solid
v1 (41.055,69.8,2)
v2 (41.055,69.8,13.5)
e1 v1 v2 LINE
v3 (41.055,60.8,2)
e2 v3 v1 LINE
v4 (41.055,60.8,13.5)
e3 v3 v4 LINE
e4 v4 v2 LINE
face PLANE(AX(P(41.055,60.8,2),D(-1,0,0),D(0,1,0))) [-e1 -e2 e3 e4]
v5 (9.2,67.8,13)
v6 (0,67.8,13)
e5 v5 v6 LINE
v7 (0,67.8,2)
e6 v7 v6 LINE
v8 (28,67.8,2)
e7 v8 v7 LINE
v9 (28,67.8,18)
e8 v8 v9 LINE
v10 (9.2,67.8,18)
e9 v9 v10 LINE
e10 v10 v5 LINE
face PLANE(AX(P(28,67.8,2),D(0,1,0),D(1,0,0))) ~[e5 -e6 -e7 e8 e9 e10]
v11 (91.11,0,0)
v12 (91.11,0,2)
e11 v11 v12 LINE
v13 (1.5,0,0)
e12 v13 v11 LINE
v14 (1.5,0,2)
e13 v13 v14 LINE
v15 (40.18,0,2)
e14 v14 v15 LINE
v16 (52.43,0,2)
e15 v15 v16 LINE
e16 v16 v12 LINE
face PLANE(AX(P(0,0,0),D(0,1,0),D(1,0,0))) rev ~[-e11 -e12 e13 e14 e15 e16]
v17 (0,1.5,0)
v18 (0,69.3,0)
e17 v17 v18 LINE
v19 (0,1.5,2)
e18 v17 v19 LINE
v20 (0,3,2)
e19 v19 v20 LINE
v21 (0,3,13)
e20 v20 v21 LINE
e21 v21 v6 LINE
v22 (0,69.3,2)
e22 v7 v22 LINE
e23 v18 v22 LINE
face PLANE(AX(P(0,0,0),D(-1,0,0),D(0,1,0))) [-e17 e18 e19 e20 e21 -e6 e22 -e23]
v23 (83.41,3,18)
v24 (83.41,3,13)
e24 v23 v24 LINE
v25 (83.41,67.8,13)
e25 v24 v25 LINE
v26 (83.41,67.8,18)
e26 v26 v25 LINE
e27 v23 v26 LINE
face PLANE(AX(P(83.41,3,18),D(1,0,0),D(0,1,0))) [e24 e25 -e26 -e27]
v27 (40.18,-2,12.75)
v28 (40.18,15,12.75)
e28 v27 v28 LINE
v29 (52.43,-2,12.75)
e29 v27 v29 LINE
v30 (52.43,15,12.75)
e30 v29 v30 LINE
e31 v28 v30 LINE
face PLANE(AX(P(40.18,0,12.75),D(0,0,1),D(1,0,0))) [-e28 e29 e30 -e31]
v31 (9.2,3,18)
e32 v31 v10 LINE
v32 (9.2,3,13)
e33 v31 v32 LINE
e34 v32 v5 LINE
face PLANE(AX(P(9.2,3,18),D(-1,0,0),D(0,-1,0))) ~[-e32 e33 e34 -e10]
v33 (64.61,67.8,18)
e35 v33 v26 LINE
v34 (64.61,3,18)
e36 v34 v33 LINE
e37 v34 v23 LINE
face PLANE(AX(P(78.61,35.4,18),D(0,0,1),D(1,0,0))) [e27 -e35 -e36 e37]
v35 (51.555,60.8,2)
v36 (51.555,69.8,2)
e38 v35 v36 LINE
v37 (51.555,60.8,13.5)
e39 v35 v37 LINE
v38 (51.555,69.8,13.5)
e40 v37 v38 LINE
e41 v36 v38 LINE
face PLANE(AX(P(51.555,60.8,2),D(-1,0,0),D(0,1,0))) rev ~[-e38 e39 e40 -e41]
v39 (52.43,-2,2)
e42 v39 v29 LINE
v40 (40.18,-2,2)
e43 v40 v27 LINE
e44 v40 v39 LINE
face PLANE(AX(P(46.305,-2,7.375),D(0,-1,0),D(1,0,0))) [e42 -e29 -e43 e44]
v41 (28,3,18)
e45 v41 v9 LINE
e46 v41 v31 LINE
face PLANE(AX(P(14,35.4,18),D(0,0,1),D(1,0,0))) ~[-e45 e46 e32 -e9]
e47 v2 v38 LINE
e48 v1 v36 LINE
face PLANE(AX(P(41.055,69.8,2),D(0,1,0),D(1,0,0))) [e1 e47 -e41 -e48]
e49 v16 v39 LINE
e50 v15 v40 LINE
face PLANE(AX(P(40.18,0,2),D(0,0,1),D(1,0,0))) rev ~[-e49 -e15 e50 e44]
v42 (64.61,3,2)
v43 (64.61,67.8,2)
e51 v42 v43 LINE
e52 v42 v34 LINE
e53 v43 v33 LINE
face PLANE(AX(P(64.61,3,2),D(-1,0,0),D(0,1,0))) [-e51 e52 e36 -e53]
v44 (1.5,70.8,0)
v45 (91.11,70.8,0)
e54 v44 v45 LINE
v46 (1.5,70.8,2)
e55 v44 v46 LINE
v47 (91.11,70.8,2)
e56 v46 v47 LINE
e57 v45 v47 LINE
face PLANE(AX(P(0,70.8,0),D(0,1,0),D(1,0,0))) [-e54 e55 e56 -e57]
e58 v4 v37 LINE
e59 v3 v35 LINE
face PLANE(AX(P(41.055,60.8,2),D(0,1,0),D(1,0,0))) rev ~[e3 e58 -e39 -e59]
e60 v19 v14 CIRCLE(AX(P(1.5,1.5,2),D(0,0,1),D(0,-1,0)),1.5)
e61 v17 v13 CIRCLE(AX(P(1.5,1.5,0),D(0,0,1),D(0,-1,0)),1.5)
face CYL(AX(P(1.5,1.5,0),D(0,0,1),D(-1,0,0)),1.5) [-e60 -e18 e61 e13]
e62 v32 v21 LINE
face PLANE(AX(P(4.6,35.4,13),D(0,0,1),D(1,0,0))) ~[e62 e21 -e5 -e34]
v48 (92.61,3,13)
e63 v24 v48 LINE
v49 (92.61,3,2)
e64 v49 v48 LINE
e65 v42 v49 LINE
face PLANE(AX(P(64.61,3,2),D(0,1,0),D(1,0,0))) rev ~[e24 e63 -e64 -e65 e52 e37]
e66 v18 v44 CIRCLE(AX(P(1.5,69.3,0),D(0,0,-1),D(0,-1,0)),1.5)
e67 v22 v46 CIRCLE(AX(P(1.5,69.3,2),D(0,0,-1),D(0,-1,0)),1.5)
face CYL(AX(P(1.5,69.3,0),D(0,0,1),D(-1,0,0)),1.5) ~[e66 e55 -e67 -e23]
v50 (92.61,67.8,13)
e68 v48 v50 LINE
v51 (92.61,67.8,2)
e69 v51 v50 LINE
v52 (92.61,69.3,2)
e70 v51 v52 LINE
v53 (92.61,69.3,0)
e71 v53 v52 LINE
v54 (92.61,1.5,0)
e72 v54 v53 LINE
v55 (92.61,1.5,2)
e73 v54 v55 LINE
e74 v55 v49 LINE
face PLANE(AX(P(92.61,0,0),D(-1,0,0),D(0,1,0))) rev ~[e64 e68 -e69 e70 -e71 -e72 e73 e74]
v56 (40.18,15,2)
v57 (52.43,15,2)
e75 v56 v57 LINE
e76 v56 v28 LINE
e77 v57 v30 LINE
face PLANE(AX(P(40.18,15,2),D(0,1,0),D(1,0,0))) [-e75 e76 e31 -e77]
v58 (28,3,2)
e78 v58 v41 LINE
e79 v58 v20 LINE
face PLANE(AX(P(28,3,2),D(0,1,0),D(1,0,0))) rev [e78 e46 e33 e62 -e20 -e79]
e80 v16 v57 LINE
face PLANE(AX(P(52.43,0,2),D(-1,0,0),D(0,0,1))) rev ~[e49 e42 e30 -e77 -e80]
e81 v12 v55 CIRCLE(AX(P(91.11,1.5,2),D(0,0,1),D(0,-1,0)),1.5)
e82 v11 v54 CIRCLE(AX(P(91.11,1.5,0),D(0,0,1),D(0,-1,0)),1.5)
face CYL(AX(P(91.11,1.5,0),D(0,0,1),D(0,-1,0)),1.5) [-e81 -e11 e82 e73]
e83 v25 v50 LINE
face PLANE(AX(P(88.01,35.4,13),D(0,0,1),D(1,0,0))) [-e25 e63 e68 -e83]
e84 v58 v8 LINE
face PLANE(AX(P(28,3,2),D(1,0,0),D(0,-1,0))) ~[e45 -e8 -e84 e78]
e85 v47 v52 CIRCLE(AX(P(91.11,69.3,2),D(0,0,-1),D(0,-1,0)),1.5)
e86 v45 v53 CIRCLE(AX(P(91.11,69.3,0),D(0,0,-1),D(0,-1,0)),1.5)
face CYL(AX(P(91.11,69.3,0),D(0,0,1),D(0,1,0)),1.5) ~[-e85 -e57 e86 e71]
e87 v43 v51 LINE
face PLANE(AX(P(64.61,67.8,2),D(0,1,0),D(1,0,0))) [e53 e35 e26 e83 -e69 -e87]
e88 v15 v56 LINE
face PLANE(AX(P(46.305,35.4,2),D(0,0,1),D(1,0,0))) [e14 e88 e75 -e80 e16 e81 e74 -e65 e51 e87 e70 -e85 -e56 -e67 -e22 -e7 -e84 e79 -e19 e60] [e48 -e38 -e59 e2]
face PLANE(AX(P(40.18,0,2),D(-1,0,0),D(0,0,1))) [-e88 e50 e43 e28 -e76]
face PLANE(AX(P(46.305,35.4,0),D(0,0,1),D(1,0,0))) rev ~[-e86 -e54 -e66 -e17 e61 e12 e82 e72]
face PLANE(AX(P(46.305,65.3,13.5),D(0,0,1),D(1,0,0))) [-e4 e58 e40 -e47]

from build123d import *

# Parameters (mm, degrees)
F0_W      = 92.61
F0_H      = 70.8
F1_DEPTH  = 2
F2_W      = 28
F2_H      = 64.8
F3_DEPTH  = 16
F4_W      = 9.2
F4_H      = 64.8
F5_DEPTH  = 5
F7_W      = 12.25
F7_H      = 15
F8_DEPTH  = 10.75
F9_R      = 1.5
F10_W     = 12.25
F10_H     = 10.75
F11_DEPTH = 2
F12_W     = 10.5
F12_H     = 9
F13_DEPTH = 11.5


# Not quite as in the source:
# - a pattern or mirror of a feature is missing from the dataset's text; its kind, count and spacing are read off the source's solid


with BuildPart() as f1:
    # F0 (on Top) → F1 (new body)
    with BuildSketch(Plane.XY):
        with Locations((46.305, 35.4)):
            Rectangle(F0_W, F0_H)
    extrude(amount=F1_DEPTH)

    # F2 (on face) → F3 (join)
    with BuildSketch(Plane.XY.offset(2)):
        with Locations((78.61, 35.4)):
            Rectangle(F2_W, F2_H)
    f3 = extrude(amount=F3_DEPTH)

    # F3_copies: F3 across plane
    add(f3.mirror(Plane(origin=(46.305, 0, 0), x_dir=(0, 0, -1), z_dir=(-1, 0, 0))))

    # F4 (on face) → F5 (cut)
    with BuildSketch(Plane.XY.offset(18)):
        with Locations((88.01, 35.4)):
            Rectangle(F4_W, F4_H)
    f5 = extrude(amount=-F5_DEPTH, mode=Mode.SUBTRACT)

    # F5_copies: F5 across plane
    add(f5.mirror(Plane(origin=(46.305, 0, 0), x_dir=(0, 0, -1), z_dir=(-1, 0, 0))), mode=Mode.SUBTRACT)

    # F7 (on face) → F8 (join)
    with BuildSketch(Plane.XY.offset(2)):
        with Locations((46.305, 7.5)):
            Rectangle(F7_W, F7_H)
    extrude(amount=F8_DEPTH)

    # F9
    f9_edges = [f1.edges().sort_by_distance(p)[0] for p in [
        (92.61, 70.8, 1),
        (0, 70.8, 1),
        (0, 0, 1),
        (92.61, 0, 1),
    ]]
    fillet(f9_edges, radius=F9_R)

    # F10 (on face) → F11 (join)
    with BuildSketch(Plane.XZ):
        with Locations((46.305, 7.375)):
            Rectangle(F10_W, F10_H)
    extrude(amount=F11_DEPTH)

    # F12 (on face) → F13 (join)
    with BuildSketch(Plane.XY.offset(2)):
        with Locations((46.305, 65.3)):
            Rectangle(F12_W, F12_H)
    extrude(amount=F13_DEPTH)


solid = f1.part
